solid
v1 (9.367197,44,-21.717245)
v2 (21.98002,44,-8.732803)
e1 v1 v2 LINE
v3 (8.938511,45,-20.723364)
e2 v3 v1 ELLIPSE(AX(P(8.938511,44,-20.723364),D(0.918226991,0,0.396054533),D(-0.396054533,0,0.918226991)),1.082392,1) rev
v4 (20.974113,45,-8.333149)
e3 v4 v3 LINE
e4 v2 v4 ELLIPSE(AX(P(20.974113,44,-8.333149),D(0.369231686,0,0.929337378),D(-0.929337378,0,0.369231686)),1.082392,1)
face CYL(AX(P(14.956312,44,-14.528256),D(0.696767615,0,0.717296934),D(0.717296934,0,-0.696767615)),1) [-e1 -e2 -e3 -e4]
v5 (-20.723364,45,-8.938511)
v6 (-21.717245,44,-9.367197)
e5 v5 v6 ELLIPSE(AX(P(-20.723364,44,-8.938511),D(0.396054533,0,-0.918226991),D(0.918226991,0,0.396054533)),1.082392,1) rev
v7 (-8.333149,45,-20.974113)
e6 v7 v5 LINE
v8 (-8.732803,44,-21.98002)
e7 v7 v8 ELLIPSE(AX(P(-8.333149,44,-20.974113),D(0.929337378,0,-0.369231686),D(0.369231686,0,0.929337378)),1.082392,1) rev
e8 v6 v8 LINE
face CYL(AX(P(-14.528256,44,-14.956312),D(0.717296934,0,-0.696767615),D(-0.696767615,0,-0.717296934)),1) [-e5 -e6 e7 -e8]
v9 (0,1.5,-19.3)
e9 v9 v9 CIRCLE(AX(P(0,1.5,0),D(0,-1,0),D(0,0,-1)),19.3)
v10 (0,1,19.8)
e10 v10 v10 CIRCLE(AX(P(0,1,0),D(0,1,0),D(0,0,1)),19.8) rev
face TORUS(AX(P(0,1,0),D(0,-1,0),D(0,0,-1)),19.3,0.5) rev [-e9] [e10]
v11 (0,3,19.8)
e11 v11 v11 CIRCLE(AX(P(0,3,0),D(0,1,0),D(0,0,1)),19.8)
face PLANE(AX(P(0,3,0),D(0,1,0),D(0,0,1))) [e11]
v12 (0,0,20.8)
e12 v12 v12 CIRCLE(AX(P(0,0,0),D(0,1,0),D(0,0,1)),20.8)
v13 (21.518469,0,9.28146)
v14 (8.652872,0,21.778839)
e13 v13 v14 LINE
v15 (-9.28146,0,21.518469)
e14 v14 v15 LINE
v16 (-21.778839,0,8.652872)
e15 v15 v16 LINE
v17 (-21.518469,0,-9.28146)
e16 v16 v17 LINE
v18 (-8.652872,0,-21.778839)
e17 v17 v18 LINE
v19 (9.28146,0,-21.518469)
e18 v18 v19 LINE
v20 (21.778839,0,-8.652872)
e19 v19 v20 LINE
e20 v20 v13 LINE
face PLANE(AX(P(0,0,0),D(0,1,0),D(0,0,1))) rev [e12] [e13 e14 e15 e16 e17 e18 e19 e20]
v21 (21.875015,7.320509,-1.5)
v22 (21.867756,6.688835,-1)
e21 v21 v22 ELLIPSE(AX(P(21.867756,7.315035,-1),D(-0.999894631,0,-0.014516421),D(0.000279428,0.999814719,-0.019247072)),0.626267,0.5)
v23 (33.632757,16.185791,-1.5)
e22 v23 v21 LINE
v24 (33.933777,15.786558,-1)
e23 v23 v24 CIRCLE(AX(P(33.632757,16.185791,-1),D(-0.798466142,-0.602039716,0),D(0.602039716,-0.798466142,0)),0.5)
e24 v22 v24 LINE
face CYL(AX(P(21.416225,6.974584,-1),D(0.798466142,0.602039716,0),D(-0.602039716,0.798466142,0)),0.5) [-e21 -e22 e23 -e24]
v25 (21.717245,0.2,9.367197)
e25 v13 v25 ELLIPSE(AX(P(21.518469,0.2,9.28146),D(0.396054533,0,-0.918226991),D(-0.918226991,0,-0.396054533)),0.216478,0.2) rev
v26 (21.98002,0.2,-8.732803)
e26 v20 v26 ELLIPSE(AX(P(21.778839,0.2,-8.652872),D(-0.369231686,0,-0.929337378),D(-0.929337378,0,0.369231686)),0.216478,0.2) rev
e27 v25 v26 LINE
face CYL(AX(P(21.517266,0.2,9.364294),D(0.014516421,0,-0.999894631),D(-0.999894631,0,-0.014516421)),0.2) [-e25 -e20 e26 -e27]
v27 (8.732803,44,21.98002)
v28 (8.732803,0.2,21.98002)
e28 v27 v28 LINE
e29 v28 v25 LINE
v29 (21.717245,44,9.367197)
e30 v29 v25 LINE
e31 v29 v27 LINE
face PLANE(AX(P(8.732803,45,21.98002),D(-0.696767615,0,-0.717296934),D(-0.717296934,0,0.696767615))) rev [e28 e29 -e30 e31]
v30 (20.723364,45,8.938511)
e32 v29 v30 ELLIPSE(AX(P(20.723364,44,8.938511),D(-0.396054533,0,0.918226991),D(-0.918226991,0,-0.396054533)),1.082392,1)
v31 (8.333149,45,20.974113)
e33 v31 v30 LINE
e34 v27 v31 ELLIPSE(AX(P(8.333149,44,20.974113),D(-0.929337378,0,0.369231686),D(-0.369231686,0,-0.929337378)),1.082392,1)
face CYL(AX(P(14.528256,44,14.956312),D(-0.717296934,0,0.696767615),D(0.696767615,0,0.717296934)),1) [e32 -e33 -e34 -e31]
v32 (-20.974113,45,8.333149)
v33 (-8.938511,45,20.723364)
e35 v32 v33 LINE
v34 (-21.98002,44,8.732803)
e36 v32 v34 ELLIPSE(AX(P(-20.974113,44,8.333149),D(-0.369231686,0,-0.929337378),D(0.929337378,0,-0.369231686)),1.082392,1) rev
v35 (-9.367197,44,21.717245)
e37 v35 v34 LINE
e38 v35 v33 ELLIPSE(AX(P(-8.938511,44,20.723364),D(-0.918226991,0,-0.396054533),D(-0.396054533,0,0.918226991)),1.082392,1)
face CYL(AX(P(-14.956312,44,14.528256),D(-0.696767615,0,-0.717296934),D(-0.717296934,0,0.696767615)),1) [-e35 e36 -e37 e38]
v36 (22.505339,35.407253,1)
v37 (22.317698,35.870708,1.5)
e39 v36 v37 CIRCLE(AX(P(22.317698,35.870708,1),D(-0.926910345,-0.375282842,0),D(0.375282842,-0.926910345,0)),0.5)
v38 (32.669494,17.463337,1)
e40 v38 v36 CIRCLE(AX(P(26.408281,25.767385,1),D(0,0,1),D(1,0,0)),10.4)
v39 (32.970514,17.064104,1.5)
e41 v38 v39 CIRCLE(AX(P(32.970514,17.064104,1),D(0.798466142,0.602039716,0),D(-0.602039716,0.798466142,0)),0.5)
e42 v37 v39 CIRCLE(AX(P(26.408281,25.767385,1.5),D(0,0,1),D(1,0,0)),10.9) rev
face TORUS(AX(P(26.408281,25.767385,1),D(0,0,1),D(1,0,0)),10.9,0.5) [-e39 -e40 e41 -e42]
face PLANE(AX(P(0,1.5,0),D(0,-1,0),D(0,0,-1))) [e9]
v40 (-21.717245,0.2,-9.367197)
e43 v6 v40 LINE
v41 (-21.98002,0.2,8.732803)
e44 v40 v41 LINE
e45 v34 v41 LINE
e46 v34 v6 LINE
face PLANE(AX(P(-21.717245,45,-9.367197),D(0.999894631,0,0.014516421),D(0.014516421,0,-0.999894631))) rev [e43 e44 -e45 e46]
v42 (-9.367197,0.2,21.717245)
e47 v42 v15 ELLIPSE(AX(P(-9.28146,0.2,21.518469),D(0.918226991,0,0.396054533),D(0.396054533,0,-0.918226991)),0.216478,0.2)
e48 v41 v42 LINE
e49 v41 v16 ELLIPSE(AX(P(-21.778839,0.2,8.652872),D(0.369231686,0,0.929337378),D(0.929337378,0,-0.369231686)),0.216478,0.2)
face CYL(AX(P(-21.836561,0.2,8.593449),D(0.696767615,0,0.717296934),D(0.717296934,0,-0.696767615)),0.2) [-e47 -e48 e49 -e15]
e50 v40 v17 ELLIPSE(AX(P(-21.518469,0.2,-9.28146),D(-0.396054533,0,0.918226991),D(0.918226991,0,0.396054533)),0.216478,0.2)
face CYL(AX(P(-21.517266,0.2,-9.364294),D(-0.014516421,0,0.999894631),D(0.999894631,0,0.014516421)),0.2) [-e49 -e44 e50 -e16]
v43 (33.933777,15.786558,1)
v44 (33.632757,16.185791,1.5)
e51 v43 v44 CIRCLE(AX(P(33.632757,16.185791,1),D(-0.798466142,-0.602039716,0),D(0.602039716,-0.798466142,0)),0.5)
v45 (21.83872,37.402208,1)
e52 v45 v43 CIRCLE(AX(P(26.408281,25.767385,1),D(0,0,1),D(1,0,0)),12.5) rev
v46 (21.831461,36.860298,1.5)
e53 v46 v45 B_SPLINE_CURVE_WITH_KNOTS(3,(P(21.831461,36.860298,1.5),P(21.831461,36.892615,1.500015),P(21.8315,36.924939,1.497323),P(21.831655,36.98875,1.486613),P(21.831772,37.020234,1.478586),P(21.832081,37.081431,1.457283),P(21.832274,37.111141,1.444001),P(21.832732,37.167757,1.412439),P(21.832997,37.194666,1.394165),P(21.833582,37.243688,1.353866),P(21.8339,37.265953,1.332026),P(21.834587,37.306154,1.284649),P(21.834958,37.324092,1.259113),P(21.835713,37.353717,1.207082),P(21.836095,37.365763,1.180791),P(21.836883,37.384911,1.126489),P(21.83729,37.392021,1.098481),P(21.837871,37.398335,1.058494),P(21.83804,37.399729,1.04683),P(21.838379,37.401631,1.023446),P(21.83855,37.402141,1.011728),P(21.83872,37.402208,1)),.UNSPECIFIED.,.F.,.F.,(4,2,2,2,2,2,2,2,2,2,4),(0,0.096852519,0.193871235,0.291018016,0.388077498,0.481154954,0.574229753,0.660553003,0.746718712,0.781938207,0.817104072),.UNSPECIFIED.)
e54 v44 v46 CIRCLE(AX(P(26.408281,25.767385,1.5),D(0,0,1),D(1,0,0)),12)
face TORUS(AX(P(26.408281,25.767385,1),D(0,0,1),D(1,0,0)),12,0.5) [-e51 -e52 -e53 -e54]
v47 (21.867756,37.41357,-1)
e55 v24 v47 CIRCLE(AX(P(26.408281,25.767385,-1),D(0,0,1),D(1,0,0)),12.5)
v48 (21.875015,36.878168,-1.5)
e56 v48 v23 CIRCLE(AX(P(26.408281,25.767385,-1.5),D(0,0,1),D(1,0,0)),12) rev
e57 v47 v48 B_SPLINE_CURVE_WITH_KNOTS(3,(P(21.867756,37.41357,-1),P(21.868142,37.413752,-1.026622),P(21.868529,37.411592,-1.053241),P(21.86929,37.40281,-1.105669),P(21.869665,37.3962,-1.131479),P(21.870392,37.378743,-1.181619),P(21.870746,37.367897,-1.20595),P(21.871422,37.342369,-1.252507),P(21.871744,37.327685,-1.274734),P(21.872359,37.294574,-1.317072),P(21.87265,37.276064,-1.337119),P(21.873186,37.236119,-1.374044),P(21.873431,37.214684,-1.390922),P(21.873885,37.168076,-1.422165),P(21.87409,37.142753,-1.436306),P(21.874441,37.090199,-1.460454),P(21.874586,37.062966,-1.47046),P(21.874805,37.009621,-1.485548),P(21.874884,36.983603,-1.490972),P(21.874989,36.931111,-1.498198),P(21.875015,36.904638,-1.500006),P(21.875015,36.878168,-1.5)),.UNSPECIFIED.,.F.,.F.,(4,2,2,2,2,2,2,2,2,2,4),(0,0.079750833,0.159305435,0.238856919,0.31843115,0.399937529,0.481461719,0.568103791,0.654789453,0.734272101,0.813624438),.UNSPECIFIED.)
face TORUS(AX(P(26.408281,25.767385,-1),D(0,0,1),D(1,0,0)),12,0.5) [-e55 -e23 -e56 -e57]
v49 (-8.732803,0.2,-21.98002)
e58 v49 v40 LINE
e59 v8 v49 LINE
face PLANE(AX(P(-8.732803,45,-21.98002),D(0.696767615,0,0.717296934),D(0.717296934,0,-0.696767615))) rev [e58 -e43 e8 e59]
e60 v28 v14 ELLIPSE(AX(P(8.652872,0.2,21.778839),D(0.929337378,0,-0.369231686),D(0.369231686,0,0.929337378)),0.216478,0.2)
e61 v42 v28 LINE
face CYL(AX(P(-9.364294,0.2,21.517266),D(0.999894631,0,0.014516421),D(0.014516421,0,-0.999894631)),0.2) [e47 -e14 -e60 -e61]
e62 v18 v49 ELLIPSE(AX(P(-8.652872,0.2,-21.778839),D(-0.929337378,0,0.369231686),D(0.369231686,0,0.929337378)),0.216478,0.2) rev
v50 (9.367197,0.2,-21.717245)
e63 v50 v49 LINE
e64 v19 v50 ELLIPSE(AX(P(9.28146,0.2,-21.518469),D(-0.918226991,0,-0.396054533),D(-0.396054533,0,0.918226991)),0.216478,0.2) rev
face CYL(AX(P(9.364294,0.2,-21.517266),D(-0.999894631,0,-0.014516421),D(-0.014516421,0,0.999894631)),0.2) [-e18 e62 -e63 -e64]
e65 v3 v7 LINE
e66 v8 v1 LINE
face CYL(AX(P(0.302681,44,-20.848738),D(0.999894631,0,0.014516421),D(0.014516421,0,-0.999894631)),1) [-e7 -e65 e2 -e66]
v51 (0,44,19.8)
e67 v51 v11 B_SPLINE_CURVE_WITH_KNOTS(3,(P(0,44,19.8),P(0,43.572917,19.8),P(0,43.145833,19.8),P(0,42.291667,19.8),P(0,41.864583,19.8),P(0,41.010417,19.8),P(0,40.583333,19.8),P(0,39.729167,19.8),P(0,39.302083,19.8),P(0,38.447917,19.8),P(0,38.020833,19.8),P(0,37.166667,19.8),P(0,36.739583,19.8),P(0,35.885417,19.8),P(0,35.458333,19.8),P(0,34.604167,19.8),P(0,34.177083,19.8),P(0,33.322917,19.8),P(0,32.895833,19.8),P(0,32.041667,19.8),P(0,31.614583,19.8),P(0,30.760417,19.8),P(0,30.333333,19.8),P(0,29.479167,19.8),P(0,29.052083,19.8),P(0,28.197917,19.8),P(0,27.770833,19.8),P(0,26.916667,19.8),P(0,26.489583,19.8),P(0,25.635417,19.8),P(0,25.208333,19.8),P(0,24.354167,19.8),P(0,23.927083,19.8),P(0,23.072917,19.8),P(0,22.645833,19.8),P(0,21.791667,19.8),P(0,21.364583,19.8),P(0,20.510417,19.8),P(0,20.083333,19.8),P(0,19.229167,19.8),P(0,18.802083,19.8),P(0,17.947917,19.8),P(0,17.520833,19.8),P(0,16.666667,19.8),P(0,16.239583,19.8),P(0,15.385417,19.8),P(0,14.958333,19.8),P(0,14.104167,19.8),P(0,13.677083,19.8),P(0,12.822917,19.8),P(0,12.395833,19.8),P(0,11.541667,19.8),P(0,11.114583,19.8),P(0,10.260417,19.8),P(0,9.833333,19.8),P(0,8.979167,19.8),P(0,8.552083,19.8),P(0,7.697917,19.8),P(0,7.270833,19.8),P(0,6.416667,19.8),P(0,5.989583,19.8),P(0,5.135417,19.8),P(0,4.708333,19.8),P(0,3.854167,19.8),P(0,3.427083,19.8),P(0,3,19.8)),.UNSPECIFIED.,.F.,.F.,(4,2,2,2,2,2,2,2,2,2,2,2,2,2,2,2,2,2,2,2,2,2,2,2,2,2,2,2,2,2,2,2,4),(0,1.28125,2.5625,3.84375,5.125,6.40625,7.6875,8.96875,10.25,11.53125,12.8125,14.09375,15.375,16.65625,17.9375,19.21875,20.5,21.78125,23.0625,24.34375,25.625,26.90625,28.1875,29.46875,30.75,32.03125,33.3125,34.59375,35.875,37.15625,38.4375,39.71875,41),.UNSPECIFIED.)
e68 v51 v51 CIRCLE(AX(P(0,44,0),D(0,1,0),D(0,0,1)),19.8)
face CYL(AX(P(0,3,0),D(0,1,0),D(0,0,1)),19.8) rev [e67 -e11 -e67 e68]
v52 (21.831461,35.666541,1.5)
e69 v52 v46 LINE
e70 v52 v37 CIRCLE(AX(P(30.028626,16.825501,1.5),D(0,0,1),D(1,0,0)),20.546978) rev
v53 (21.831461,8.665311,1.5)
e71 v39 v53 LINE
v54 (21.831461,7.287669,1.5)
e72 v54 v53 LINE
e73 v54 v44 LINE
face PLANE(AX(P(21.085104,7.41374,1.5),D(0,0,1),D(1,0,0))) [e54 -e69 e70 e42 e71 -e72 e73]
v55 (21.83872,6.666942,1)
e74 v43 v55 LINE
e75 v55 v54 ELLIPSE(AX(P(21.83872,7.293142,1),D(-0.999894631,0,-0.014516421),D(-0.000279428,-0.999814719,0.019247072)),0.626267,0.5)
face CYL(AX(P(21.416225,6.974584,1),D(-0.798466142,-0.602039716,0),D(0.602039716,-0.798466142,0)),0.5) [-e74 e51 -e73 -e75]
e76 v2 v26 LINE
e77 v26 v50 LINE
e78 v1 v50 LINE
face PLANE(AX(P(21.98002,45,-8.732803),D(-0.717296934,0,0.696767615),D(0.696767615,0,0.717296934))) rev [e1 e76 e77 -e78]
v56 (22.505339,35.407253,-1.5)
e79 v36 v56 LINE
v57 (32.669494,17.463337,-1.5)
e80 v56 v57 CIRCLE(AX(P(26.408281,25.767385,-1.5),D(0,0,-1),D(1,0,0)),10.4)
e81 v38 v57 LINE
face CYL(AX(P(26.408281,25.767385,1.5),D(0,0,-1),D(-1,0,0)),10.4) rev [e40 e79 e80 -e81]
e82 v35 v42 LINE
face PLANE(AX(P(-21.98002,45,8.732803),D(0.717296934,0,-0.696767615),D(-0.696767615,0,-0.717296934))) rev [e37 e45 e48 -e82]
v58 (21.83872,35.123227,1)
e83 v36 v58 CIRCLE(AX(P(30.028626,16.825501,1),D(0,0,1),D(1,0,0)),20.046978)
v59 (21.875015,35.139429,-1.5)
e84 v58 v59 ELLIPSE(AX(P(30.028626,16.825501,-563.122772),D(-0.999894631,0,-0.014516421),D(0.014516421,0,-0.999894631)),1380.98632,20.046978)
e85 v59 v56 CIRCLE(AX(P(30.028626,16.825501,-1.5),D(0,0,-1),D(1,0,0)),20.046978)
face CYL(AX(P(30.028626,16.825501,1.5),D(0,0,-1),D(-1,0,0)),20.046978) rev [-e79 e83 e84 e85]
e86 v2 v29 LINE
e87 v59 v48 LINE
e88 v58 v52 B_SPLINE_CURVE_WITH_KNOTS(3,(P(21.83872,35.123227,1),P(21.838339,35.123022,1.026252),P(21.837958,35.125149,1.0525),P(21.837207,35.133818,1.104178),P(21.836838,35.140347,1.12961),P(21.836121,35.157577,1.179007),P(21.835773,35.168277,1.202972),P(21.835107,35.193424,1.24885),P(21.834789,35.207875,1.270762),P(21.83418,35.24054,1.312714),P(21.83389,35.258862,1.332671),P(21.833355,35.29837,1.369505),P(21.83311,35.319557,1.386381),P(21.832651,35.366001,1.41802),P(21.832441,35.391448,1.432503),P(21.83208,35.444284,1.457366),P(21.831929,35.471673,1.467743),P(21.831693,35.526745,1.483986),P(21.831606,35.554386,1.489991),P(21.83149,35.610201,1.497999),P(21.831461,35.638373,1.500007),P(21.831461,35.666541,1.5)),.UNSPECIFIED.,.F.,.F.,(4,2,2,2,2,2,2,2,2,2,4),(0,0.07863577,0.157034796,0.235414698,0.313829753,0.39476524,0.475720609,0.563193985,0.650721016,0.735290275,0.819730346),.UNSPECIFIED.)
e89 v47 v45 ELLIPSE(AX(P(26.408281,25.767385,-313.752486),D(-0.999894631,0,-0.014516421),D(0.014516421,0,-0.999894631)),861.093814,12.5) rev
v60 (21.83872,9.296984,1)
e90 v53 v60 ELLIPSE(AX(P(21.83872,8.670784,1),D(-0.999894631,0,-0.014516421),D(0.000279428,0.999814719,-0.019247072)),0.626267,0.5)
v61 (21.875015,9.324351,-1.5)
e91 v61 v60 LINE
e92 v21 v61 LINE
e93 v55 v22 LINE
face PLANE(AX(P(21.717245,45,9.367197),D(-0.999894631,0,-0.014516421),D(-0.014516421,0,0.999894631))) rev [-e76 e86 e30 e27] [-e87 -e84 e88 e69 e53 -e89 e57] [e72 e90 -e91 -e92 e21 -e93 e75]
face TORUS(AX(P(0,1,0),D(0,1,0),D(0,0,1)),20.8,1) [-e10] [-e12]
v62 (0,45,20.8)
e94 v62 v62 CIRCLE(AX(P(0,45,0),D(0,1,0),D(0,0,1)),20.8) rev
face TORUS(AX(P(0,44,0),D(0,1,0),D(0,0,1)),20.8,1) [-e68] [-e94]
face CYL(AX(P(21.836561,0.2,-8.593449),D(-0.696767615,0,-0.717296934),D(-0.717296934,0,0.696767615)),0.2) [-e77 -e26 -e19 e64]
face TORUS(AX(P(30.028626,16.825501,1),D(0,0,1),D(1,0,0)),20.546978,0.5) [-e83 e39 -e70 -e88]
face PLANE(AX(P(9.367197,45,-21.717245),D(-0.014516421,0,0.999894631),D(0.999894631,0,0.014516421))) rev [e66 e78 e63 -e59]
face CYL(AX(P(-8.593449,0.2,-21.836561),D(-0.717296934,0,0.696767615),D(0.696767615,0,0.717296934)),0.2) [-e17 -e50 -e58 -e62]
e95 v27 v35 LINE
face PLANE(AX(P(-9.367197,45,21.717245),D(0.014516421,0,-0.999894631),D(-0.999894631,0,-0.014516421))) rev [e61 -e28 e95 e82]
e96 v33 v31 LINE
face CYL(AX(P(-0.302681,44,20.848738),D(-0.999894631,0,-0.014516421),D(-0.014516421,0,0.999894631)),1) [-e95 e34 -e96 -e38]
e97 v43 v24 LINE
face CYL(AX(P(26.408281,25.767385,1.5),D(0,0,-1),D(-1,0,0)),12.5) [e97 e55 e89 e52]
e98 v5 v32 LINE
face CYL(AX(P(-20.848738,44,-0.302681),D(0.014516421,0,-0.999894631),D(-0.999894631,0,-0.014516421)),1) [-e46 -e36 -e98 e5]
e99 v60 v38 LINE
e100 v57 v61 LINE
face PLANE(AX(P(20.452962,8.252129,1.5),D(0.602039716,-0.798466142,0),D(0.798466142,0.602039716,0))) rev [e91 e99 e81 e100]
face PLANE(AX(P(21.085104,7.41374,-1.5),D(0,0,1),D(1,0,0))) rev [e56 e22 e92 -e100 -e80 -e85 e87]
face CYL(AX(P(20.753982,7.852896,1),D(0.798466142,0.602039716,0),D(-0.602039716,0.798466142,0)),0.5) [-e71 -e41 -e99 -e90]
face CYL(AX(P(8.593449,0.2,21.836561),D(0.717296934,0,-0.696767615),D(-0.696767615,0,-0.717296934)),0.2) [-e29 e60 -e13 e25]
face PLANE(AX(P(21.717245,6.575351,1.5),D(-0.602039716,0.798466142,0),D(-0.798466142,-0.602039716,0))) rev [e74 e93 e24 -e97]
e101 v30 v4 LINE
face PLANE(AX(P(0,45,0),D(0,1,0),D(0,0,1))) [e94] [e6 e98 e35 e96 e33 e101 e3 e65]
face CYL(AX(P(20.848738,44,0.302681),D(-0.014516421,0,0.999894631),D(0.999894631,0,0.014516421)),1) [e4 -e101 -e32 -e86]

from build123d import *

# Parameters (mm, degrees)
BOSS_EXTRUDE1_DEPTH = 45
SKETCH2_R           = 19.8
CUT_EXTRUDE1_DEPTH  = 42
CUT_EXTRUDE2_START  = -1.5
SKETCH3_R           = 19.8
CUT_EXTRUDE2_DEPTH  = 1.5
FILLET1_R           = 1
FILLET2_R           = 0.5
FILLET3_R           = 1
FILLET4_R           = 1
BOSS_EXTRUDE2_DEPTH = 1.5
FILLET5_R           = 0.2
FILLET6_R           = 0.5
FILLET7_R           = 0.5


with BuildPart() as part:
    # Sketch1 → Boss-Extrude1 (new body)
    with BuildSketch(Plane(origin=(0, 0, 0), x_dir=(1, 0, 0), z_dir=(0, 1, 0))):
        Polygon((8.732802634, -21.98002019), (21.717245289, -9.367197366), (21.98002019, 8.732802634), (9.367197366, 21.717245289), (-8.732802634, 21.98002019), (-21.717245289, 9.367197366), (-21.98002019, -8.732802634), (-9.367197366, -21.717245289), align=None)
    extrude(amount=BOSS_EXTRUDE1_DEPTH)

    # Sketch2 → Cut-Extrude1 (cut)
    with BuildSketch(Plane(origin=(0, 45, 0), x_dir=(1, 0, 0), z_dir=(0, 1, 0))):
        with Locations(Location((0, 0, 0), (0, 0, 270))):
            Circle(SKETCH2_R)
    extrude(amount=-CUT_EXTRUDE1_DEPTH, mode=Mode.SUBTRACT)

    # Sketch3 → Cut-Extrude2 (cut)
    with BuildSketch(Plane.XZ.offset(CUT_EXTRUDE2_START)):
        with Locations(Location((0, 0, 0), (0, 0, 90))):
            Circle(SKETCH3_R)
    extrude(amount=CUT_EXTRUDE2_DEPTH, mode=Mode.SUBTRACT)

    # Fillet1
    fillet1_edges = [part.edges().sort_by_distance(p)[0] for p in [
        (0, 0, -19.8),
    ]]
    fillet(fillet1_edges, radius=FILLET1_R)

    # Fillet2
    fillet2_edges = [part.edges().sort_by_distance(p)[0] for p in [
        (0, 1.5, -19.8),
    ]]
    fillet(fillet2_edges, radius=FILLET2_R - 0.0001)  # a hair under: the kernel refuses the full size

    # Fillet3
    fillet3_edges = [part.edges().sort_by_distance(p)[0] for p in [
        (21.848632739, 45, 0.317197366),
        (15.673608778, 45, -15.225023962),
        (0.317197366, 45, -21.848632739),
        (-15.225023962, 45, -15.673608778),
        (-21.848632739, 45, -0.317197366),
        (-15.673608778, 45, 15.225023962),
        (-0.317197366, 45, 21.848632739),
        (15.225023962, 45, 15.673608778),
    ]]
    fillet(fillet3_edges, radius=FILLET3_R)

    # Fillet4
    fillet4_edges = [part.edges().sort_by_distance(p)[0] for p in [
        (0, 45, -19.8),
    ]]
    fillet(fillet4_edges, radius=FILLET4_R)

    # Sketch4 → Boss-Extrude2 (add, symmetric)
    with BuildSketch(Plane.XY):
        with BuildLine():
            Line((21.717245289, 6.575350598), (33.933777265, 15.786558253))
            ThreePointArc((33.933777265, 15.786558253), (37.284614612, 31.928177441), (21.717245289, 37.353764349))
            ThreePointArc((21.717245289, 37.353764349), (21.300504514, 37.172559686), (20.8935235, 36.970385359))
            Line((20.8935235, 36.970385359), (21.490631851, 34.963416872))
            ThreePointArc((21.490631851, 34.963416872), (21.994919911, 35.192343489), (22.505339257, 35.407252623))
            ThreePointArc((22.505339257, 35.407252623), (35.457390534, 30.893164316), (32.669493861, 17.463337152))
            Line((32.669493861, 17.463337152), (20.452961885, 8.252129496))
            ThreePointArc((20.452961885, 8.252129496), (20.246714138, 6.781598345), (21.717245289, 6.575350598))
        make_face()
    extrude(amount=BOSS_EXTRUDE2_DEPTH, both=True)

    # Fillet5
    fillet5_edges = [part.edges().sort_by_distance(p)[0] for p in [
        (15.673608778, 0, -15.225023962),
        (21.848632739, 0, 0.317197366),
        (15.225023962, 0, 15.673608778),
        (-0.317197366, 0, 21.848632739),
        (-15.673608778, 0, 15.225023962),
        (-21.848632739, 0, -0.317197366),
        (-15.225023962, 0, -15.673608778),
        (0.317197366, 0, -21.848632739),
    ]]
    fillet(fillet5_edges, radius=FILLET5_R)

    # Fillet6
    fillet6_edges = [part.edges().sort_by_distance(p)[0] for p in [
        (27.882619067, 11.224013431, 1.5),
        (27.904395993, 11.24043313, -1.5),
        (37.31478879, 31.874600745, 1.5),
        (37.326195009, 31.854186297, -1.5),
    ]]
    fillet(fillet6_edges, radius=FILLET6_R)

    # Fillet7
    fillet7_edges = [part.edges().sort_by_distance(p)[0] for p in [
        (27.250477366, 13.3774242, 1.5),
        (35.457390534, 30.893164316, 1.5),
        (22.167087746, 35.266692743, 1.5),
    ]]
    fillet(fillet7_edges, radius=FILLET7_R)


solid = part.part
